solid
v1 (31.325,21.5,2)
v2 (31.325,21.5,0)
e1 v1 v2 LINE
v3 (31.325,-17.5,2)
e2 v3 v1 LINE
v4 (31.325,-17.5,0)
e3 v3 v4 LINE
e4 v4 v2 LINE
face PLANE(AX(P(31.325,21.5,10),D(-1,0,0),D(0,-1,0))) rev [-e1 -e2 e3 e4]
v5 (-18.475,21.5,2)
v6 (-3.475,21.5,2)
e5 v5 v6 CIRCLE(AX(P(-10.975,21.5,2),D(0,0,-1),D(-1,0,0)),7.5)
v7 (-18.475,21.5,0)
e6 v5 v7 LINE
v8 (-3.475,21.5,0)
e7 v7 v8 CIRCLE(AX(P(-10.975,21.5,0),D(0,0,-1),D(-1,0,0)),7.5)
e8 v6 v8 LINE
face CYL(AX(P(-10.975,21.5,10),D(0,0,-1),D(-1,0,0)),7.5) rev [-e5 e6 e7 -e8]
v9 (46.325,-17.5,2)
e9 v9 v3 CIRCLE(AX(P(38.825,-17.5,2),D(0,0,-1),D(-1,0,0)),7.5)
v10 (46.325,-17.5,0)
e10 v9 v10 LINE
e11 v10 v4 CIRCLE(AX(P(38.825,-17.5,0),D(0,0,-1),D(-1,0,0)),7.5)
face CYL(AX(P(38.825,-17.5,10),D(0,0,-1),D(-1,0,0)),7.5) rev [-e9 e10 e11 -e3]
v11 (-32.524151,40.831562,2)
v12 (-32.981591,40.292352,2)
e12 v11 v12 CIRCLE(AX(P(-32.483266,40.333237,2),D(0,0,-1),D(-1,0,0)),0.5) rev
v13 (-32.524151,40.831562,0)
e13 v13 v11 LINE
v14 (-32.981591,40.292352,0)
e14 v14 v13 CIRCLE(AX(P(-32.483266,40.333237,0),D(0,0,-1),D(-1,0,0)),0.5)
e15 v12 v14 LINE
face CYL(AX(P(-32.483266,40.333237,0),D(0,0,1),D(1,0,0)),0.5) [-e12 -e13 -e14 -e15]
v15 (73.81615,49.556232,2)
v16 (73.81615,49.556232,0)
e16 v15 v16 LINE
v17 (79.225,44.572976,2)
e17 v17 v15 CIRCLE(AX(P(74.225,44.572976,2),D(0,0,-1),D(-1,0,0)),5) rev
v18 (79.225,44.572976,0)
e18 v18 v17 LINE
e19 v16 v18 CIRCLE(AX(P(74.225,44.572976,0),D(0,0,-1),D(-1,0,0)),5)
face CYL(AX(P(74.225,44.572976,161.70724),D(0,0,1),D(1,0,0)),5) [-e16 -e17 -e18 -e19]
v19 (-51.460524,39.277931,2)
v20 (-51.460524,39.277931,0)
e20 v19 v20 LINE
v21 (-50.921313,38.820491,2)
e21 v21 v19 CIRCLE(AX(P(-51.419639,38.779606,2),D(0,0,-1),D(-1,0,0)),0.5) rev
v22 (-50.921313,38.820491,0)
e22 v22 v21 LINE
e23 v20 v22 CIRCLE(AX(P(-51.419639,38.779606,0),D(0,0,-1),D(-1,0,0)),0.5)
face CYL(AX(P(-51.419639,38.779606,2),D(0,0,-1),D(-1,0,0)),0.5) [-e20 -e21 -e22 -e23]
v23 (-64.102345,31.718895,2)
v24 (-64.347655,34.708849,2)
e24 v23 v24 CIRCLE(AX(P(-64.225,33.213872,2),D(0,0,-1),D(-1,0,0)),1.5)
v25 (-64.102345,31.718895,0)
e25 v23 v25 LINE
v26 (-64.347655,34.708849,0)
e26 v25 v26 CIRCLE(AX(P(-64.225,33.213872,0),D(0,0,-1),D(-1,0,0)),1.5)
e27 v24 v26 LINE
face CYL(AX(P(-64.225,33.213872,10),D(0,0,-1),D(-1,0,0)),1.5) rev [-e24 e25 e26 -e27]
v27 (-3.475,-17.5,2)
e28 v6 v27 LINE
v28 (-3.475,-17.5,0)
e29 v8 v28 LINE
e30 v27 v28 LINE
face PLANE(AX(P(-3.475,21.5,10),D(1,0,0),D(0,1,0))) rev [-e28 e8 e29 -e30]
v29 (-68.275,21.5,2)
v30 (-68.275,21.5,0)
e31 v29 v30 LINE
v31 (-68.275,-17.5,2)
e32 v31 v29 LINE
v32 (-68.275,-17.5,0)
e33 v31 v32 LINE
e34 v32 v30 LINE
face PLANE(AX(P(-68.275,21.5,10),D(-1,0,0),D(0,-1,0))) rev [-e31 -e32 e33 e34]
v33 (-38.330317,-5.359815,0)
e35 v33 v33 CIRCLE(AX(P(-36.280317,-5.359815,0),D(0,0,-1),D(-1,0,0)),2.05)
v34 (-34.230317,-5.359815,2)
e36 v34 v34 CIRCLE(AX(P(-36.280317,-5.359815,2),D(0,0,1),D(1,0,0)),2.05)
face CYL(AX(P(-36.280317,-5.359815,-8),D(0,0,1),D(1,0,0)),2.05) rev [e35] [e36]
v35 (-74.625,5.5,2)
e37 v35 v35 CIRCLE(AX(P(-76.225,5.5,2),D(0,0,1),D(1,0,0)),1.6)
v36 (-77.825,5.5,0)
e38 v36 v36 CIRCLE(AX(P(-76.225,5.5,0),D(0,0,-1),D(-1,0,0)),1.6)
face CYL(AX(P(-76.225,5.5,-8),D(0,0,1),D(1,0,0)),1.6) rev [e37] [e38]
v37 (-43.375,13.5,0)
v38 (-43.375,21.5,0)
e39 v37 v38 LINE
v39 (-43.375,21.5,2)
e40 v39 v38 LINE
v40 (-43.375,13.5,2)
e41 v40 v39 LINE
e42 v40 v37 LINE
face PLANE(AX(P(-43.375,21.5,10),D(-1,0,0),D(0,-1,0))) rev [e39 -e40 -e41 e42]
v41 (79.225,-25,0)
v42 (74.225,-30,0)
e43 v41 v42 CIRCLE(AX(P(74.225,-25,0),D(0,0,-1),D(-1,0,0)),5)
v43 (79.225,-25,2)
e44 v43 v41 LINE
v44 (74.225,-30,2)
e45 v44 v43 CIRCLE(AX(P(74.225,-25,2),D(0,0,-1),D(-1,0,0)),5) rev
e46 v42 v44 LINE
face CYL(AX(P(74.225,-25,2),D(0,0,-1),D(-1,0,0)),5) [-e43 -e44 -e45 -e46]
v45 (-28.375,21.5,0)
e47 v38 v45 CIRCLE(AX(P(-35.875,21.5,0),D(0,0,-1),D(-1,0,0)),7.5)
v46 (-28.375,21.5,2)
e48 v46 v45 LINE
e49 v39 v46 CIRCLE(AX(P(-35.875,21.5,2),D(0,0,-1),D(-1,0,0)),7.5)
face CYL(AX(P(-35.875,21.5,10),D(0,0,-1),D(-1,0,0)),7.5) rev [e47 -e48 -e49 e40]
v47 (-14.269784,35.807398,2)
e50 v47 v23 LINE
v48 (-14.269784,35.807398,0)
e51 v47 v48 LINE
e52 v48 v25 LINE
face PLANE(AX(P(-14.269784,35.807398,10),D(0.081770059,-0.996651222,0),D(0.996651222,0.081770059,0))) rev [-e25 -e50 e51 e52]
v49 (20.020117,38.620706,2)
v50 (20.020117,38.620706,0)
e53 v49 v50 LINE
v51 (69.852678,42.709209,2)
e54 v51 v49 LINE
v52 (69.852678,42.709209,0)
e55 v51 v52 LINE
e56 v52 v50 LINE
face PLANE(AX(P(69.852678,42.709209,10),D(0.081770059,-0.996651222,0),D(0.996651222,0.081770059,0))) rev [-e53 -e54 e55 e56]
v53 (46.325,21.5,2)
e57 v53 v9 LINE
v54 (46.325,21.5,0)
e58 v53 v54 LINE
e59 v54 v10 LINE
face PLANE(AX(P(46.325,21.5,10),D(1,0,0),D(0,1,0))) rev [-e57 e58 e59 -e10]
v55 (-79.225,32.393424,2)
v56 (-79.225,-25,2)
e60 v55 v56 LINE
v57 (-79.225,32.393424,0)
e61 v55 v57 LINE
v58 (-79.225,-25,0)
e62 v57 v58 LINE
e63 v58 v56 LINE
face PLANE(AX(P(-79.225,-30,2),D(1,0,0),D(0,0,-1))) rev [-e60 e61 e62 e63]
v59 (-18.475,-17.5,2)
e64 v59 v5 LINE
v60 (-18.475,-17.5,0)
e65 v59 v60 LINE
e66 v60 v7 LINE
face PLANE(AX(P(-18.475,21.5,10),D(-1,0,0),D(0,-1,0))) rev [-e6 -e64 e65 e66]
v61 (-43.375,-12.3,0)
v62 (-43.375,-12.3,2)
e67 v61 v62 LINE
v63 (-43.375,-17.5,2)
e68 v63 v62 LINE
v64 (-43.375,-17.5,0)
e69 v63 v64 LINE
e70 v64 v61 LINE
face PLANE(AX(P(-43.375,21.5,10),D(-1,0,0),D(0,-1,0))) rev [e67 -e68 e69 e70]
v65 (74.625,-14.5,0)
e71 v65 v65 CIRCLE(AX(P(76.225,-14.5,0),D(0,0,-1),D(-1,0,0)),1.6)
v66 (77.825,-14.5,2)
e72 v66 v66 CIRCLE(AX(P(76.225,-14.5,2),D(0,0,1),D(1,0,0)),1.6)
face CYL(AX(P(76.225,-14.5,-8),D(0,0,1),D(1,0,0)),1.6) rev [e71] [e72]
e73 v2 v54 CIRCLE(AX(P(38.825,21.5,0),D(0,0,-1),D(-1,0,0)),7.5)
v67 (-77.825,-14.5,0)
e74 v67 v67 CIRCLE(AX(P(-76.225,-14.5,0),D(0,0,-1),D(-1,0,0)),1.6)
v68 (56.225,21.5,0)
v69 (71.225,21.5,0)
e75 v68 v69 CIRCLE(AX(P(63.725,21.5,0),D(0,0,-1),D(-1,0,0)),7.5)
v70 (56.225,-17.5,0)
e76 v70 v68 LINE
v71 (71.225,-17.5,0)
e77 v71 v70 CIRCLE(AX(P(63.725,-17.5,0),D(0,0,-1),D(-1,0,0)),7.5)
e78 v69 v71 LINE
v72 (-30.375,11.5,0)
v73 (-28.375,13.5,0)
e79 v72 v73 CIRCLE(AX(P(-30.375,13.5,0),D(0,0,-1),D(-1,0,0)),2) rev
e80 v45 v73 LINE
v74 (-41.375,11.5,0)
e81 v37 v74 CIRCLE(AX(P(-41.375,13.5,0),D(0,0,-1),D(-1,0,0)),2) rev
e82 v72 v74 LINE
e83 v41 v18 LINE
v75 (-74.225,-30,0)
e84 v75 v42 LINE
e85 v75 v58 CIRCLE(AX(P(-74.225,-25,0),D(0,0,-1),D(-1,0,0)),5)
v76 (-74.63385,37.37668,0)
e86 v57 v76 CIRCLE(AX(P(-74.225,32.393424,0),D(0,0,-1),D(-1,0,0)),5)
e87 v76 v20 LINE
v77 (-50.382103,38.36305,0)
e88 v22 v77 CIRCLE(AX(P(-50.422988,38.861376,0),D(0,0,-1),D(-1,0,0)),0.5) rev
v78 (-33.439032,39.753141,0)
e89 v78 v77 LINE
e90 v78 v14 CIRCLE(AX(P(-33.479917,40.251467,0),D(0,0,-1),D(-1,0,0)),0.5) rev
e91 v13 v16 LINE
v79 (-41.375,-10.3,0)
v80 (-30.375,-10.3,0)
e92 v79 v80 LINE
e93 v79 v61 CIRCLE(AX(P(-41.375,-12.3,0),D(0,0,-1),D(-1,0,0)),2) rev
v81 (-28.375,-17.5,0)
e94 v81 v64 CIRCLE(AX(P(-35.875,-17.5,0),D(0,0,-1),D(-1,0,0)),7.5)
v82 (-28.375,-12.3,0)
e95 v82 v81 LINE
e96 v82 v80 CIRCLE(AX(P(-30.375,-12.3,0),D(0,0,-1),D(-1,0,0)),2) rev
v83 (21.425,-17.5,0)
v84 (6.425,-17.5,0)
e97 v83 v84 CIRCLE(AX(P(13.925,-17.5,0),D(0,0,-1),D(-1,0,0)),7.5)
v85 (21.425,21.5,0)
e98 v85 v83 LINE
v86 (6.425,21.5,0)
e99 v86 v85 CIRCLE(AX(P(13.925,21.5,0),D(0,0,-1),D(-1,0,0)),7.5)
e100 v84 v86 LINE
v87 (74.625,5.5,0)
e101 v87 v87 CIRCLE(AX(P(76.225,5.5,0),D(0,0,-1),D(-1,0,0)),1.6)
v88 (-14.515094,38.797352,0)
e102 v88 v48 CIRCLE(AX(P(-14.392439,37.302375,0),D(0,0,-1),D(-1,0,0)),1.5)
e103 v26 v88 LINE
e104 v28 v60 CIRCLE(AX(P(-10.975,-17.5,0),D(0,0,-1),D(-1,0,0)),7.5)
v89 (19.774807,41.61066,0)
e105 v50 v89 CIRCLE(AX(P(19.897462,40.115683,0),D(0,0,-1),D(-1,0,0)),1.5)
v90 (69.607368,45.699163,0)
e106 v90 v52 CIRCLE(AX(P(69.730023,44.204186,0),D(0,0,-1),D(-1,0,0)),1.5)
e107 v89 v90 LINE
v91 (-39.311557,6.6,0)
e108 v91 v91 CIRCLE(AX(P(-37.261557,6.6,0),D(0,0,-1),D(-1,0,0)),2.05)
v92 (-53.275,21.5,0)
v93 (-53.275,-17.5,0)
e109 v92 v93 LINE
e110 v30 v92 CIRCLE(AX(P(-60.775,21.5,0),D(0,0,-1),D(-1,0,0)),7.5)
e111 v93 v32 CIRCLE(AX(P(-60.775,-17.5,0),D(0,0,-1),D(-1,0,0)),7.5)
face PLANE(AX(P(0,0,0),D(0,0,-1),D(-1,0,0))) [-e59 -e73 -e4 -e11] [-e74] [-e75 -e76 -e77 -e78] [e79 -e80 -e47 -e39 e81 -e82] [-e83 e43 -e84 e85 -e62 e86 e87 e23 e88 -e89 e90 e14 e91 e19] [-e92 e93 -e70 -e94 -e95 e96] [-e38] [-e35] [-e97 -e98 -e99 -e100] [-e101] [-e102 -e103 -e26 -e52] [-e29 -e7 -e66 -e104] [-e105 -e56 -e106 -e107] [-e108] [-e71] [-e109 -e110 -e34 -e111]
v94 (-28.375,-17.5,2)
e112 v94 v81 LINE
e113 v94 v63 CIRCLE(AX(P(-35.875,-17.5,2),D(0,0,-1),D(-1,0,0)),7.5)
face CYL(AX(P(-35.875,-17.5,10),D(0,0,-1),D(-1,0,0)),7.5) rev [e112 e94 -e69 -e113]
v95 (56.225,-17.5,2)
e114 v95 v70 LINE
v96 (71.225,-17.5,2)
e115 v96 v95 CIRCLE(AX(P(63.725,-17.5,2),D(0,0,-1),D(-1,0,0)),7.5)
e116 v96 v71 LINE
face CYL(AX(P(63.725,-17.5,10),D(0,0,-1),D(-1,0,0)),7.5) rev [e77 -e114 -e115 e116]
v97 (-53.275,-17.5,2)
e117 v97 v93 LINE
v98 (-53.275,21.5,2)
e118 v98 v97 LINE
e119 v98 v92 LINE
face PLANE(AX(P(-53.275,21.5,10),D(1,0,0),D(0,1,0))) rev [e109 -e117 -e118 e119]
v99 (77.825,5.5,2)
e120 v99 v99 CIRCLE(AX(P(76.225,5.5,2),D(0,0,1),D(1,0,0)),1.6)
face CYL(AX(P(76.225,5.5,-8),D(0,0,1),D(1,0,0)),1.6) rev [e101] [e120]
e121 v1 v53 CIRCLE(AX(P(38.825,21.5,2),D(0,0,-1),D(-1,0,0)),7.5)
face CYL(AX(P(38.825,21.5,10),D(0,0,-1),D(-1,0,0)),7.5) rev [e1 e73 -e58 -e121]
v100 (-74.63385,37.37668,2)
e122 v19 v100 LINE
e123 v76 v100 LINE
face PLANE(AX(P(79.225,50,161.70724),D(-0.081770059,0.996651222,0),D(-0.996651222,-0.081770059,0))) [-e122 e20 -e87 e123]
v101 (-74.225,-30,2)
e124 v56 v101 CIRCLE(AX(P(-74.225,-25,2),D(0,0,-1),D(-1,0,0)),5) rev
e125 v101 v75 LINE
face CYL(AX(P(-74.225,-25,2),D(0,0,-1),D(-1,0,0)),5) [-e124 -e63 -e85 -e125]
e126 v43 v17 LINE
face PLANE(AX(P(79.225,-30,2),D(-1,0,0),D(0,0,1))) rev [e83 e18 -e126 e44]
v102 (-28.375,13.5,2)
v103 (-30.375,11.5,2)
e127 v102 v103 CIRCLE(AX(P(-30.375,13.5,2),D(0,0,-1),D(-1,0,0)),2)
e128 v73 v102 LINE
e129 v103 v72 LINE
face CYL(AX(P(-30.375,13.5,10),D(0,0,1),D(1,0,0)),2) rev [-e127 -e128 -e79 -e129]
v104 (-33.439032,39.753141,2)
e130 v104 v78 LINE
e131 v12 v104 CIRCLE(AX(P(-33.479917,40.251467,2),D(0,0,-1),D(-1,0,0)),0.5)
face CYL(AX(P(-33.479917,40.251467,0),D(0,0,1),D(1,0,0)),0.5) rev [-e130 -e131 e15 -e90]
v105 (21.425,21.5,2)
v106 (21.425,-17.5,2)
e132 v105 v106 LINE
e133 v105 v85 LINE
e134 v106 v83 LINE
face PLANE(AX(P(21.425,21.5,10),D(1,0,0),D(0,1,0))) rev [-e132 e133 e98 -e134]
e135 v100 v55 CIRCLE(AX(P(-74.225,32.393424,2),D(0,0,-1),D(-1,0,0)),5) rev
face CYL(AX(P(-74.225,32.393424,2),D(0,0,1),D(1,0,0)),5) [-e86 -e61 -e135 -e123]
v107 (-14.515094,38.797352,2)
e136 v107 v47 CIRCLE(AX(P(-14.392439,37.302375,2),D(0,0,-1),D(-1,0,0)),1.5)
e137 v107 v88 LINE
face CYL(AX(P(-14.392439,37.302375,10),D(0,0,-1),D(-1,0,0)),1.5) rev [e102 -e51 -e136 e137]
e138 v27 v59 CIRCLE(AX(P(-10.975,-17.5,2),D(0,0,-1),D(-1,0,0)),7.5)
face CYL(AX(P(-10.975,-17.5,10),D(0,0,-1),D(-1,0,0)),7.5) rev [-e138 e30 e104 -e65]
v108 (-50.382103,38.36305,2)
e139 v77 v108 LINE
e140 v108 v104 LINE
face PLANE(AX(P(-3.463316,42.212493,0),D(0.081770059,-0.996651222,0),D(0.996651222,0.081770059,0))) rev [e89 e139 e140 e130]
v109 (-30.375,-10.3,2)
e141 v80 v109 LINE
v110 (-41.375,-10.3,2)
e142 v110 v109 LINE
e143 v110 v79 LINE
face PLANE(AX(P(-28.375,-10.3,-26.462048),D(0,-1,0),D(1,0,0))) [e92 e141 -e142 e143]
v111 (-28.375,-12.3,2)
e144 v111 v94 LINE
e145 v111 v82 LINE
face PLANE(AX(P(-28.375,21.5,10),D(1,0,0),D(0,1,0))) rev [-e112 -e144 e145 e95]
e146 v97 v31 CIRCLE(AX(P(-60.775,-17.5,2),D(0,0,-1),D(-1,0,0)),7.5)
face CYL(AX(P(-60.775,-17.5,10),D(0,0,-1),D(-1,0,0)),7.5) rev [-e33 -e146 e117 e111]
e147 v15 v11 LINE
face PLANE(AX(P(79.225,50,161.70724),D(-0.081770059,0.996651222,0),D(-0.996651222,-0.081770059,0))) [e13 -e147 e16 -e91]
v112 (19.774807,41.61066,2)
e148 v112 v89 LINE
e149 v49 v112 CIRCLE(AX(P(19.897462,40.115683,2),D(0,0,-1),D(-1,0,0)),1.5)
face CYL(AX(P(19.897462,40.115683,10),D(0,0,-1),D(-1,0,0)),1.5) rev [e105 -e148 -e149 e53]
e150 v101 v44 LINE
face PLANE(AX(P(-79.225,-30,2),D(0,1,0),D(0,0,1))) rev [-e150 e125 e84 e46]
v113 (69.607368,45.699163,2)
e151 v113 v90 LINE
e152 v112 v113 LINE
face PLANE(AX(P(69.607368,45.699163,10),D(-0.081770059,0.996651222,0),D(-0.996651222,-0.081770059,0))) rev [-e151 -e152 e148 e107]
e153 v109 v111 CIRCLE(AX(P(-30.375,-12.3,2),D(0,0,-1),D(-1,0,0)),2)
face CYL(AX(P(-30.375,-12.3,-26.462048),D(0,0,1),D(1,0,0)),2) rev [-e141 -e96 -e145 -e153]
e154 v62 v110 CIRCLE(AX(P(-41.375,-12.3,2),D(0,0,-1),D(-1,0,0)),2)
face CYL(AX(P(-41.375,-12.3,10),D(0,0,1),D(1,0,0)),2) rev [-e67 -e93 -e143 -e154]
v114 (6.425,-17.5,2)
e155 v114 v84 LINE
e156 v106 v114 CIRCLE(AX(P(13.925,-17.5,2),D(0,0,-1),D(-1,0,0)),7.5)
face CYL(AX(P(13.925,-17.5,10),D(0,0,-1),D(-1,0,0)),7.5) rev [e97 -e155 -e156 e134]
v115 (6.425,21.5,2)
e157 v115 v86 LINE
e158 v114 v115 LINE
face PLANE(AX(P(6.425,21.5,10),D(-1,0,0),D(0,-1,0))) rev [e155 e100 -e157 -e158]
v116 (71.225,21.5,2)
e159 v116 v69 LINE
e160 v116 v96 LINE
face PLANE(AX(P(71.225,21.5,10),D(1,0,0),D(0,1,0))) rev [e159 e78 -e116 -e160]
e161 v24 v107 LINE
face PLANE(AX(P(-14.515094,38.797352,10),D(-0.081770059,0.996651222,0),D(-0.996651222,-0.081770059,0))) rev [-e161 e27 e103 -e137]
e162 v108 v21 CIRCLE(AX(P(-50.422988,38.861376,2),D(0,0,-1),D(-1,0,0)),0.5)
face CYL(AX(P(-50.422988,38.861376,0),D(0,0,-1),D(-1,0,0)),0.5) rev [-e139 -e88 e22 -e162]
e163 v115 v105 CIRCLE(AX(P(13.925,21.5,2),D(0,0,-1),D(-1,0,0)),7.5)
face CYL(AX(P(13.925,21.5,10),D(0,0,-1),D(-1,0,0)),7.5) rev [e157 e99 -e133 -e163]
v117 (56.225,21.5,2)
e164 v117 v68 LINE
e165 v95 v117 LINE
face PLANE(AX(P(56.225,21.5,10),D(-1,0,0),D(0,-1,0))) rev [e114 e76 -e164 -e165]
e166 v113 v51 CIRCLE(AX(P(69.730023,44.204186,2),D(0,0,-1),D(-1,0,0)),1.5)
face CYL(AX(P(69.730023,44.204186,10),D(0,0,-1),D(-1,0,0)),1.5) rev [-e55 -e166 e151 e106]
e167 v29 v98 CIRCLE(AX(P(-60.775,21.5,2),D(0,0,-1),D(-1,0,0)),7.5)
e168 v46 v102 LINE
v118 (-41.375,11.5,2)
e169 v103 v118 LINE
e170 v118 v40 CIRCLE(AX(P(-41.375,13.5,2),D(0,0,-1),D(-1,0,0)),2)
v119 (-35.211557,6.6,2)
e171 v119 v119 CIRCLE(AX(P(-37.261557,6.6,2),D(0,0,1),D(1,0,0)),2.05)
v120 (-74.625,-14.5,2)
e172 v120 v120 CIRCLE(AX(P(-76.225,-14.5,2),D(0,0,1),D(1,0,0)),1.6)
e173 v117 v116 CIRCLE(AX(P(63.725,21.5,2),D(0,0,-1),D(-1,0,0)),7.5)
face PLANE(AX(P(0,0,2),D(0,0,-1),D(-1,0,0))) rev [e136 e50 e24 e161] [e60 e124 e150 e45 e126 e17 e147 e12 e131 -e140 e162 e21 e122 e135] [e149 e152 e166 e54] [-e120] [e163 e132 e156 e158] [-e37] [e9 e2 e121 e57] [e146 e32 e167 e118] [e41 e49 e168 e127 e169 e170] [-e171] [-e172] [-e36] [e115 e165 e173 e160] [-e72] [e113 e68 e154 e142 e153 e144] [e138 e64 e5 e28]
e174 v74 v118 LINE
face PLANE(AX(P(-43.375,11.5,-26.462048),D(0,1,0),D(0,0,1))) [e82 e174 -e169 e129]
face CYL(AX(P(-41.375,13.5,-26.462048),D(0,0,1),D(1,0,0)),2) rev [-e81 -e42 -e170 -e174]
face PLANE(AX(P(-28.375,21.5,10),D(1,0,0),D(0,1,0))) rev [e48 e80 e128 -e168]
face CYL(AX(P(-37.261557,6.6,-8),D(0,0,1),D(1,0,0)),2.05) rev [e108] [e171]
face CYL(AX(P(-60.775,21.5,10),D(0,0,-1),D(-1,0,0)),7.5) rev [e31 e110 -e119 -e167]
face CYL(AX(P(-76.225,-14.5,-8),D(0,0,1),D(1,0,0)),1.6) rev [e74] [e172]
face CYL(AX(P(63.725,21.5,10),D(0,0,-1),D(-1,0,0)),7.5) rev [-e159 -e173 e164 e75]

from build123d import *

# Parameters (mm, degrees)
SKETCH_1_W             = 158.45
SKETCH_1_H             = 60
EXTRUDE_1_DEPTH        = 2
SKETCH_2_R             = 1.6
CUT_EXTRUDE_1_DEPTH    = 10
EXTRUDE_2_DEPTH        = 2
CUT_EXTRUDE_2_DEPTH    = 10
PATTERN_LINEAR_1_COUNT = 6
PATTERN_LINEAR_1_PITCH = 24.9
FILLET_1_R             = 5
CUT_EXTRUDE_3_DEPTH    = 10
SKETCH_6_W             = 15
SKETCH_6_H             = 21.8
EXTRUDE_3_DEPTH        = 2
SKETCH_7_R             = 2.05
CUT_EXTRUDE_4_DEPTH    = 10
FILLET_2_R             = 2
SKETCH_8_W             = 18
SKETCH_8_H             = 2
CUT_EXTRUDE_5_DEPTH    = 1
FILLET_3_R             = 0.5


with BuildPart() as part:
    # 草图1 → 凸台-拉伸1 (new body)
    with BuildSketch(Plane.XY):
        Rectangle(SKETCH_1_W, SKETCH_1_H)
    extrude(amount=EXTRUDE_1_DEPTH)

    # 草图2 → 切除-拉伸1 (cut)
    with BuildSketch(Plane.XY.offset(2)):
        with Locations((-76.225, -14.5)):
            Circle(SKETCH_2_R)
        with Locations((-76.225, 5.5)):
            Circle(SKETCH_2_R)
        with Locations((76.225, -14.5)):
            Circle(SKETCH_2_R)
        with Locations((76.225, 5.5)):
            Circle(SKETCH_2_R)
    extrude(amount=-CUT_EXTRUDE_1_DEPTH, mode=Mode.SUBTRACT)

    # 草图3 → 凸台-拉伸2 (add)
    with BuildSketch(Plane(origin=(0, 0, 0), x_dir=(-1, 0, 0), z_dir=(0, 0, -1))):
        Polygon((-79.225, 30), (-79.225, 50), (79.225, 37), (79.225, 30), align=None)
    extrude(amount=-EXTRUDE_2_DEPTH)

    # 草图4 → 切除-拉伸2 (cut)
    with BuildSketch(Plane(origin=(0, 0, 0), x_dir=(-1, 0, 0), z_dir=(0, 0, -1))):
        with BuildLine():
            Line((-56.225, 21.5), (-56.225, -17.5))
            ThreePointArc((-56.225, -17.5), (-63.725, -25), (-71.225, -17.5))
            Line((-71.225, -17.5), (-71.225, 21.5))
            ThreePointArc((-71.225, 21.5), (-63.725, 29), (-56.225, 21.5))
        make_face()
    cut_extrude_2 = extrude(amount=-CUT_EXTRUDE_2_DEPTH, mode=Mode.SUBTRACT)

    # 阵列(线性)1: 切除-拉伸2 ×6
    with Locations(*[(-i * PATTERN_LINEAR_1_PITCH, 0, 0) for i in range(1, PATTERN_LINEAR_1_COUNT)]):
        add(cut_extrude_2, mode=Mode.SUBTRACT)

    # 圆角1
    fillet_1_edges = [part.edges().sort_by_distance(p)[0] for p in [
        (79.225, 50, 1),
        (-79.225, 37, 1),
        (79.225, -30, 1),
        (-79.225, -30, 1),
    ]]
    fillet(fillet_1_edges, radius=FILLET_1_R)

    # 草图5 → 切除-拉伸3 (cut)
    with BuildSketch(Plane(origin=(0, 0, 0), x_dir=(-1, 0, 0), z_dir=(0, 0, -1))):
        with BuildLine():
            Line((-69.607368079, 45.699163119), (-19.774807001, 41.610660159))
            ThreePointArc((-19.774807001, 41.610660159), (-18.402485258, 39.993028237), (-20.020117179, 38.620706494))
            Line((-20.020117179, 38.620706494), (-69.852678256, 42.709209454))
            ThreePointArc((-69.852678256, 42.709209454), (-71.225, 44.326841375), (-69.607368079, 45.699163119))
        make_face()
        with BuildLine():
            Line((14.515094011, 38.797351776), (64.347655089, 34.708848816))
            ThreePointArc((64.347655089, 34.708848816), (65.719976832, 33.091216895), (64.102344911, 31.718895152))
            Line((64.102344911, 31.718895152), (14.269783834, 35.807398112))
            ThreePointArc((14.269783834, 35.807398112), (12.89746209, 37.425030033), (14.515094011, 38.797351776))
        make_face()
    extrude(amount=-CUT_EXTRUDE_3_DEPTH, mode=Mode.SUBTRACT)

    # 草图6 → 凸台-拉伸3 (add)
    with BuildSketch(Plane.XY.offset(2)):
        with Locations((-35.875, 0.6)):
            Rectangle(SKETCH_6_W, SKETCH_6_H)
    extrude(amount=-EXTRUDE_3_DEPTH)

    # 草图7 → 切除-拉伸4 (cut)
    with BuildSketch(Plane.XY.offset(2)):
        with Locations((-37.261557274, 6.6)):
            Circle(SKETCH_7_R)
        with Locations((-36.280316563, -5.359814659)):
            Circle(SKETCH_7_R)
    extrude(amount=-CUT_EXTRUDE_4_DEPTH, mode=Mode.SUBTRACT)

    # 圆角2
    fillet_2_edges = [part.edges().sort_by_distance(p)[0] for p in [
        (-28.375, -10.3, 1),
        (-28.375, 11.5, 1),
        (-43.375, 11.5, 1),
        (-43.375, -10.3, 1),
    ]]
    fillet(fillet_2_edges, radius=FILLET_2_R)

    # 草图8 → 切除-拉伸5 (cut)
    with BuildSketch(Plane(origin=(-3.545085978, 43.209144098, 0), x_dir=(0.9966512215507048, 0.08177005919948983, 0), z_dir=(-0.08177005919948983, 0.9966512215507048, 0))):
        with Locations((-38.57643531, -1)):
            Rectangle(SKETCH_8_W, SKETCH_8_H)
    extrude(amount=-CUT_EXTRUDE_5_DEPTH, mode=Mode.SUBTRACT)

    # 圆角3
    fillet_3_edges = [part.edges().sort_by_distance(p)[0] for p in [
        (-50.880428288, 38.322164944, 1),
        (-32.9407063, 39.79402601, 1),
    ]]
    fillet(fillet_3_edges, radius=FILLET_3_R)
    fillet_3_2_edges = [part.edges().sort_by_distance(p)[0] for p in [
        (-50.962198347, 39.318816166, 1),
        (-33.022476359, 40.790677231, 1),
    ]]
    fillet(fillet_3_2_edges, radius=FILLET_3_R - 0.0001)  # a hair under: the kernel refuses the full size


solid = part.part
